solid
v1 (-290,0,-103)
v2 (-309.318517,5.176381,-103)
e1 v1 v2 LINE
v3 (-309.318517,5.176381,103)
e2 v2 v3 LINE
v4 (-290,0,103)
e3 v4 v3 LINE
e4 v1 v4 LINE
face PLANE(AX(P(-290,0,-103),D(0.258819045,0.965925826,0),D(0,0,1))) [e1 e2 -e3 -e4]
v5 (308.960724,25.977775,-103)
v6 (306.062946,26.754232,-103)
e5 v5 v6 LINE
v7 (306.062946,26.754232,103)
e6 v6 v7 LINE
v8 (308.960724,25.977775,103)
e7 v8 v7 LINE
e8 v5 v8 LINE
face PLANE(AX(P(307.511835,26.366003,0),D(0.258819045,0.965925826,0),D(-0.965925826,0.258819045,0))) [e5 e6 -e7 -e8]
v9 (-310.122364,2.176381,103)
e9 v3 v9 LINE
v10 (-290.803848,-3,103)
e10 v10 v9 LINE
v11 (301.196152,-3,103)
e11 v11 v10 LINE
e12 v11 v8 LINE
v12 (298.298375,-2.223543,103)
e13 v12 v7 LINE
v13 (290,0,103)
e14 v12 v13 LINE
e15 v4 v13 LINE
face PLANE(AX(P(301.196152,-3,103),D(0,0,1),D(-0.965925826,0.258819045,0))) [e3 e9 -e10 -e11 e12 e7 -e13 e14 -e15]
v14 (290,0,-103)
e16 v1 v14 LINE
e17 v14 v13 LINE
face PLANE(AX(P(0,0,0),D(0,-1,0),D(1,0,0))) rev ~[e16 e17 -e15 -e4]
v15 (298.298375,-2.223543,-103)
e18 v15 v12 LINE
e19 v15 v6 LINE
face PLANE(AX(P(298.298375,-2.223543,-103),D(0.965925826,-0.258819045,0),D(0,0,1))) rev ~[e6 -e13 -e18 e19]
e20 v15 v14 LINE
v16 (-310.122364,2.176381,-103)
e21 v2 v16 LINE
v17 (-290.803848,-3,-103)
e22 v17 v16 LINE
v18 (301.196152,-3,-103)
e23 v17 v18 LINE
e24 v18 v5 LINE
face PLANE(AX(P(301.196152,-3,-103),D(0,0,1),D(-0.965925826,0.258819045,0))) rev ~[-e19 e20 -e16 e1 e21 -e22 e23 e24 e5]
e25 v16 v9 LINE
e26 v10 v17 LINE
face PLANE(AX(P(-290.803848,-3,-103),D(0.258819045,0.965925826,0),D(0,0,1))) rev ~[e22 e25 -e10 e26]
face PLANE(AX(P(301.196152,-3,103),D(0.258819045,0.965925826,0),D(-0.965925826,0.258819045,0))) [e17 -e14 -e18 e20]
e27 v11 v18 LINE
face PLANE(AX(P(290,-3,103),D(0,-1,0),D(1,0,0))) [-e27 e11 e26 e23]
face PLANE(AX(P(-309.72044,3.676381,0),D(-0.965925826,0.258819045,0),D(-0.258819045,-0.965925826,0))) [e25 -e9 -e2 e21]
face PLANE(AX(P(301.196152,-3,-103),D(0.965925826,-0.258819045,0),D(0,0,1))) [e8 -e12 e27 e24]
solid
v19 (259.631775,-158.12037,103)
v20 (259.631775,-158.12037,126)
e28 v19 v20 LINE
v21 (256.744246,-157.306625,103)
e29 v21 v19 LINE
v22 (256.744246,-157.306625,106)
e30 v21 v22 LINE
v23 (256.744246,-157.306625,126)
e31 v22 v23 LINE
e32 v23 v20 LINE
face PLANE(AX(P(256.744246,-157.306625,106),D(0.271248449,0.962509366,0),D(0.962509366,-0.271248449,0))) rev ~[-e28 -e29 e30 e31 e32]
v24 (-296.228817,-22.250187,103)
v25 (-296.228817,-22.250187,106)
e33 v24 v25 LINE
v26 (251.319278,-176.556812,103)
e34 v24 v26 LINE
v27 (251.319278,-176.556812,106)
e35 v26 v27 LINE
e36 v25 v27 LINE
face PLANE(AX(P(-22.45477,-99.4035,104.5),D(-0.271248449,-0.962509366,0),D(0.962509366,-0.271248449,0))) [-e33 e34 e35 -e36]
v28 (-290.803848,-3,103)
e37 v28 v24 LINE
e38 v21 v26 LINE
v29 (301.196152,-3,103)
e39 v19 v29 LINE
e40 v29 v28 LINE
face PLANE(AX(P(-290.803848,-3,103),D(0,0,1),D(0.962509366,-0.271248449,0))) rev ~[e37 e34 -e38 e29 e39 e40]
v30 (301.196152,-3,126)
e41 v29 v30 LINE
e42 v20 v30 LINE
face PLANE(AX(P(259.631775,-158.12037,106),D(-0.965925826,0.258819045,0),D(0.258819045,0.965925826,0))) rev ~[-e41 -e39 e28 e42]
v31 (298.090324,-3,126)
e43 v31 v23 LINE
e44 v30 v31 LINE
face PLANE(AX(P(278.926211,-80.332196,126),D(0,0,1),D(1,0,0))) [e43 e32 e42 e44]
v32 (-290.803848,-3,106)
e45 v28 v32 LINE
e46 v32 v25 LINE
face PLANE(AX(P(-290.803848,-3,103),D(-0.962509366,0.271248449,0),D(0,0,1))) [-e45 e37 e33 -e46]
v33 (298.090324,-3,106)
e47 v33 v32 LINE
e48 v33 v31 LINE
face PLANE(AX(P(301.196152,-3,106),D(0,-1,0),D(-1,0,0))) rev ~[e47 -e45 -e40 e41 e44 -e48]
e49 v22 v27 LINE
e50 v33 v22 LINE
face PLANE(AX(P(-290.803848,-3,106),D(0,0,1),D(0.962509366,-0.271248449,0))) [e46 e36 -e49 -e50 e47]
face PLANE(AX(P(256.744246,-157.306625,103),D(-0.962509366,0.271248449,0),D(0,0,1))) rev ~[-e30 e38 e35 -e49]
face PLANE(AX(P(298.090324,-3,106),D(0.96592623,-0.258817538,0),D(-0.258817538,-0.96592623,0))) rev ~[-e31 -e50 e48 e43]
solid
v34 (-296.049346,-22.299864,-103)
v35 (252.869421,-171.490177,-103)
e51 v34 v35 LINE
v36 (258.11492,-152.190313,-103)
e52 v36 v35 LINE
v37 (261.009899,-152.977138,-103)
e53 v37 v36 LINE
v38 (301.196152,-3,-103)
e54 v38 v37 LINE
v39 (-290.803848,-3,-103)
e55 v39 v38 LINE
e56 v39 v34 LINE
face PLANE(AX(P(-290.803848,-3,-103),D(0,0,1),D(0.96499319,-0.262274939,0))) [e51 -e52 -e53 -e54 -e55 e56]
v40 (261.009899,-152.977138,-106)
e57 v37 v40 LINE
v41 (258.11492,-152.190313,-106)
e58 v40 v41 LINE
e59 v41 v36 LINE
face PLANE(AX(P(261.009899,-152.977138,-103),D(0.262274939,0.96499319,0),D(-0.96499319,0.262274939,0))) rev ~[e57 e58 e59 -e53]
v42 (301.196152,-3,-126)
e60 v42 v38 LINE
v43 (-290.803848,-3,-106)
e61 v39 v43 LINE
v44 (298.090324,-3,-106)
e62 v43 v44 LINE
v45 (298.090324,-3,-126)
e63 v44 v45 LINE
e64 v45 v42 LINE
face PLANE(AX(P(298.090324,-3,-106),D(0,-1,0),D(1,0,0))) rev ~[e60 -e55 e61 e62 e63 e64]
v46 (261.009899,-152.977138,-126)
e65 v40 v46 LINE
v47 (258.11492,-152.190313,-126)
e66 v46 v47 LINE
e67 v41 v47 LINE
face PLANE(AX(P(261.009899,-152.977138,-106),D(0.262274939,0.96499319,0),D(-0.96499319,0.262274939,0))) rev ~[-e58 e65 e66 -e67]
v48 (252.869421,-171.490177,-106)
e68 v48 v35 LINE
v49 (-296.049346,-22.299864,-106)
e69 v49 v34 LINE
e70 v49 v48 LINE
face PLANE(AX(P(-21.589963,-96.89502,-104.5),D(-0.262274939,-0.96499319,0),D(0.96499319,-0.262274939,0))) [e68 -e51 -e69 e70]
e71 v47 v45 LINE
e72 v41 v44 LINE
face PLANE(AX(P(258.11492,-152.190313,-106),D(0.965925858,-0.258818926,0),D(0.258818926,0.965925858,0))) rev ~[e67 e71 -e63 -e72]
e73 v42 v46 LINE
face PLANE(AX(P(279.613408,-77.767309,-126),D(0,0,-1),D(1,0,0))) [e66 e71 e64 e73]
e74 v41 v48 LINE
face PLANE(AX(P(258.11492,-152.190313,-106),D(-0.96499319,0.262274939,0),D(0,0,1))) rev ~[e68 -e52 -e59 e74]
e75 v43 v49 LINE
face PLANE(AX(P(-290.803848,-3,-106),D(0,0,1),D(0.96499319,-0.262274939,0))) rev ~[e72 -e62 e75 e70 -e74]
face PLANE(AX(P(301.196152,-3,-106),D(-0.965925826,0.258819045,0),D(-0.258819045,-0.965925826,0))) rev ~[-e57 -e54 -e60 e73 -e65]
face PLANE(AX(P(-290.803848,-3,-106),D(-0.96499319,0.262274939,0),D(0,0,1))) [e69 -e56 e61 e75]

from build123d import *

# Parameters (mm, degrees)
F0_W      = 580
F0_H      = 206
F1_DEPTH  = 3
F3_DEPTH  = 206
F4_W      = 3.1058285412
F4_H      = 206
F5_DEPTH  = 20
F6_DEPTH  = 206
F7_W      = 3
F7_H      = 206
F8_DEPTH  = 30
F9_DEPTH  = 3
F11_DEPTH = 3
F13_DEPTH = 20
F15_DEPTH = 20
F16_W     = 568.8317526069
F16_H     = 3
F17_DEPTH = 20
F18_W     = 568.8756012417
F18_H     = 3
F19_DEPTH = 20


# Not quite as in the source:
# - a feature names something its author has since deleted; it is built from what else it names


with BuildPart() as f1:
    # F0 (on Front) → F1 (new body)
    with BuildSketch(Plane.XZ):
        Rectangle(F0_W, F0_H)
    extrude(amount=F1_DEPTH)

    # F2 (on face) → F3 (join)
    with BuildSketch(Plane.XY.offset(103)):
        Polygon((-290, -3), (-290, 0), (-290.8038475773, -3), align=None)
    extrude(amount=-F3_DEPTH)

    # F4 (on face) → F5 (join)
    with BuildSketch(Plane(origin=(-270.5736835487, 72.5, 0), x_dir=(-0.2588190451, -0.9659258263, 0), z_dir=(-0.9659258263, 0.2588190451, 0))):
        with Locations((76.6104373503, 0)):
            Rectangle(F4_W, F4_H)
    extrude(amount=F5_DEPTH)

    # F2 (on face) → F6 (join)
    with BuildSketch(Plane.XY.offset(103)):
        Polygon((301.1961524227, -3), (290, 0), (290, -3), align=None)
    extrude(amount=-F6_DEPTH)

    # F7 (on face) → F8 (join)
    with BuildSketch(Plane(origin=(19.4263164513, 72.5, 0), x_dir=(-0.9659258263, 0.2588190451, 0), z_dir=(0.2588190451, 0.9659258263, 0))):
        with Locations((-290.2095995393, 0)):
            Rectangle(F7_W, F7_H)
    extrude(amount=F8_DEPTH)



with BuildPart() as f9:
    # F2 (on face) → F9 (new body)
    with BuildSketch(Plane.XY.offset(103)):
        Polygon((-290, -3), (-290.8038475773, -3), (259.6317745839, -158.1203698794), (301.1961524227, -3), (290, -3), align=None)
    extrude(amount=F9_DEPTH)

    # F14 (on face) → F15 (join)
    with BuildSketch(Plane.XY.offset(106)):
        Polygon((256.7442464871, -157.3066245323), (259.6317745839, -158.1203698794), (301.1961524227, -3), (298.0903238817, -3), align=None)
    extrude(amount=F15_DEPTH)


with BuildPart() as f11:
    # F10 (on face) → F11 (new body)
    with BuildSketch(Plane(origin=(0, 0, -103), x_dir=(1, 0, 0), z_dir=(0, 0, -1))):
        Polygon((261.0098994174, 152.9771379815), (-290.8038475773, 3), (301.1961524227, 3), align=None)
    extrude(amount=F11_DEPTH)

    # F12 (on face) → F13 (join)
    with BuildSketch(Plane(origin=(0, 0, -106), x_dir=(1, 0, 0), z_dir=(0, 0, -1))):
        Polygon((301.1961524227, 3), (261.0098994174, 152.9771379815), (258.1149198479, 152.1903131648), (298.0903240127, 3), align=None)
    extrude(amount=F13_DEPTH)


with BuildPart() as f1_1:
    add(f1.part)

    add(f11.part)  # F17 merges F11
    # F16 (on face) → F17 (join)
    with BuildSketch(Plane(origin=(-20.7631374105, -76.3942078643, 0), x_dir=(0.9649931898, -0.2622749389, 0), z_dir=(-0.2622749389, -0.9649931898, 0))):
        with Locations((4.5789686315, -104.5)):
            Rectangle(F16_W, F16_H)
    extrude(amount=F17_DEPTH)


    add(f9.part)  # F19 merges F9
    # F18 (on face) → F19 (join)
    with BuildSketch(Plane(origin=(-22.1793403036, -78.7021007532, 0), x_dir=(0.9625093656, -0.271248449, 0), z_dir=(-0.271248449, -0.9625093656, 0))):
        with Locations((5.3501191182, 104.5)):
            Rectangle(F18_W, F18_H)
    extrude(amount=F19_DEPTH)


solid = f1_1.part
